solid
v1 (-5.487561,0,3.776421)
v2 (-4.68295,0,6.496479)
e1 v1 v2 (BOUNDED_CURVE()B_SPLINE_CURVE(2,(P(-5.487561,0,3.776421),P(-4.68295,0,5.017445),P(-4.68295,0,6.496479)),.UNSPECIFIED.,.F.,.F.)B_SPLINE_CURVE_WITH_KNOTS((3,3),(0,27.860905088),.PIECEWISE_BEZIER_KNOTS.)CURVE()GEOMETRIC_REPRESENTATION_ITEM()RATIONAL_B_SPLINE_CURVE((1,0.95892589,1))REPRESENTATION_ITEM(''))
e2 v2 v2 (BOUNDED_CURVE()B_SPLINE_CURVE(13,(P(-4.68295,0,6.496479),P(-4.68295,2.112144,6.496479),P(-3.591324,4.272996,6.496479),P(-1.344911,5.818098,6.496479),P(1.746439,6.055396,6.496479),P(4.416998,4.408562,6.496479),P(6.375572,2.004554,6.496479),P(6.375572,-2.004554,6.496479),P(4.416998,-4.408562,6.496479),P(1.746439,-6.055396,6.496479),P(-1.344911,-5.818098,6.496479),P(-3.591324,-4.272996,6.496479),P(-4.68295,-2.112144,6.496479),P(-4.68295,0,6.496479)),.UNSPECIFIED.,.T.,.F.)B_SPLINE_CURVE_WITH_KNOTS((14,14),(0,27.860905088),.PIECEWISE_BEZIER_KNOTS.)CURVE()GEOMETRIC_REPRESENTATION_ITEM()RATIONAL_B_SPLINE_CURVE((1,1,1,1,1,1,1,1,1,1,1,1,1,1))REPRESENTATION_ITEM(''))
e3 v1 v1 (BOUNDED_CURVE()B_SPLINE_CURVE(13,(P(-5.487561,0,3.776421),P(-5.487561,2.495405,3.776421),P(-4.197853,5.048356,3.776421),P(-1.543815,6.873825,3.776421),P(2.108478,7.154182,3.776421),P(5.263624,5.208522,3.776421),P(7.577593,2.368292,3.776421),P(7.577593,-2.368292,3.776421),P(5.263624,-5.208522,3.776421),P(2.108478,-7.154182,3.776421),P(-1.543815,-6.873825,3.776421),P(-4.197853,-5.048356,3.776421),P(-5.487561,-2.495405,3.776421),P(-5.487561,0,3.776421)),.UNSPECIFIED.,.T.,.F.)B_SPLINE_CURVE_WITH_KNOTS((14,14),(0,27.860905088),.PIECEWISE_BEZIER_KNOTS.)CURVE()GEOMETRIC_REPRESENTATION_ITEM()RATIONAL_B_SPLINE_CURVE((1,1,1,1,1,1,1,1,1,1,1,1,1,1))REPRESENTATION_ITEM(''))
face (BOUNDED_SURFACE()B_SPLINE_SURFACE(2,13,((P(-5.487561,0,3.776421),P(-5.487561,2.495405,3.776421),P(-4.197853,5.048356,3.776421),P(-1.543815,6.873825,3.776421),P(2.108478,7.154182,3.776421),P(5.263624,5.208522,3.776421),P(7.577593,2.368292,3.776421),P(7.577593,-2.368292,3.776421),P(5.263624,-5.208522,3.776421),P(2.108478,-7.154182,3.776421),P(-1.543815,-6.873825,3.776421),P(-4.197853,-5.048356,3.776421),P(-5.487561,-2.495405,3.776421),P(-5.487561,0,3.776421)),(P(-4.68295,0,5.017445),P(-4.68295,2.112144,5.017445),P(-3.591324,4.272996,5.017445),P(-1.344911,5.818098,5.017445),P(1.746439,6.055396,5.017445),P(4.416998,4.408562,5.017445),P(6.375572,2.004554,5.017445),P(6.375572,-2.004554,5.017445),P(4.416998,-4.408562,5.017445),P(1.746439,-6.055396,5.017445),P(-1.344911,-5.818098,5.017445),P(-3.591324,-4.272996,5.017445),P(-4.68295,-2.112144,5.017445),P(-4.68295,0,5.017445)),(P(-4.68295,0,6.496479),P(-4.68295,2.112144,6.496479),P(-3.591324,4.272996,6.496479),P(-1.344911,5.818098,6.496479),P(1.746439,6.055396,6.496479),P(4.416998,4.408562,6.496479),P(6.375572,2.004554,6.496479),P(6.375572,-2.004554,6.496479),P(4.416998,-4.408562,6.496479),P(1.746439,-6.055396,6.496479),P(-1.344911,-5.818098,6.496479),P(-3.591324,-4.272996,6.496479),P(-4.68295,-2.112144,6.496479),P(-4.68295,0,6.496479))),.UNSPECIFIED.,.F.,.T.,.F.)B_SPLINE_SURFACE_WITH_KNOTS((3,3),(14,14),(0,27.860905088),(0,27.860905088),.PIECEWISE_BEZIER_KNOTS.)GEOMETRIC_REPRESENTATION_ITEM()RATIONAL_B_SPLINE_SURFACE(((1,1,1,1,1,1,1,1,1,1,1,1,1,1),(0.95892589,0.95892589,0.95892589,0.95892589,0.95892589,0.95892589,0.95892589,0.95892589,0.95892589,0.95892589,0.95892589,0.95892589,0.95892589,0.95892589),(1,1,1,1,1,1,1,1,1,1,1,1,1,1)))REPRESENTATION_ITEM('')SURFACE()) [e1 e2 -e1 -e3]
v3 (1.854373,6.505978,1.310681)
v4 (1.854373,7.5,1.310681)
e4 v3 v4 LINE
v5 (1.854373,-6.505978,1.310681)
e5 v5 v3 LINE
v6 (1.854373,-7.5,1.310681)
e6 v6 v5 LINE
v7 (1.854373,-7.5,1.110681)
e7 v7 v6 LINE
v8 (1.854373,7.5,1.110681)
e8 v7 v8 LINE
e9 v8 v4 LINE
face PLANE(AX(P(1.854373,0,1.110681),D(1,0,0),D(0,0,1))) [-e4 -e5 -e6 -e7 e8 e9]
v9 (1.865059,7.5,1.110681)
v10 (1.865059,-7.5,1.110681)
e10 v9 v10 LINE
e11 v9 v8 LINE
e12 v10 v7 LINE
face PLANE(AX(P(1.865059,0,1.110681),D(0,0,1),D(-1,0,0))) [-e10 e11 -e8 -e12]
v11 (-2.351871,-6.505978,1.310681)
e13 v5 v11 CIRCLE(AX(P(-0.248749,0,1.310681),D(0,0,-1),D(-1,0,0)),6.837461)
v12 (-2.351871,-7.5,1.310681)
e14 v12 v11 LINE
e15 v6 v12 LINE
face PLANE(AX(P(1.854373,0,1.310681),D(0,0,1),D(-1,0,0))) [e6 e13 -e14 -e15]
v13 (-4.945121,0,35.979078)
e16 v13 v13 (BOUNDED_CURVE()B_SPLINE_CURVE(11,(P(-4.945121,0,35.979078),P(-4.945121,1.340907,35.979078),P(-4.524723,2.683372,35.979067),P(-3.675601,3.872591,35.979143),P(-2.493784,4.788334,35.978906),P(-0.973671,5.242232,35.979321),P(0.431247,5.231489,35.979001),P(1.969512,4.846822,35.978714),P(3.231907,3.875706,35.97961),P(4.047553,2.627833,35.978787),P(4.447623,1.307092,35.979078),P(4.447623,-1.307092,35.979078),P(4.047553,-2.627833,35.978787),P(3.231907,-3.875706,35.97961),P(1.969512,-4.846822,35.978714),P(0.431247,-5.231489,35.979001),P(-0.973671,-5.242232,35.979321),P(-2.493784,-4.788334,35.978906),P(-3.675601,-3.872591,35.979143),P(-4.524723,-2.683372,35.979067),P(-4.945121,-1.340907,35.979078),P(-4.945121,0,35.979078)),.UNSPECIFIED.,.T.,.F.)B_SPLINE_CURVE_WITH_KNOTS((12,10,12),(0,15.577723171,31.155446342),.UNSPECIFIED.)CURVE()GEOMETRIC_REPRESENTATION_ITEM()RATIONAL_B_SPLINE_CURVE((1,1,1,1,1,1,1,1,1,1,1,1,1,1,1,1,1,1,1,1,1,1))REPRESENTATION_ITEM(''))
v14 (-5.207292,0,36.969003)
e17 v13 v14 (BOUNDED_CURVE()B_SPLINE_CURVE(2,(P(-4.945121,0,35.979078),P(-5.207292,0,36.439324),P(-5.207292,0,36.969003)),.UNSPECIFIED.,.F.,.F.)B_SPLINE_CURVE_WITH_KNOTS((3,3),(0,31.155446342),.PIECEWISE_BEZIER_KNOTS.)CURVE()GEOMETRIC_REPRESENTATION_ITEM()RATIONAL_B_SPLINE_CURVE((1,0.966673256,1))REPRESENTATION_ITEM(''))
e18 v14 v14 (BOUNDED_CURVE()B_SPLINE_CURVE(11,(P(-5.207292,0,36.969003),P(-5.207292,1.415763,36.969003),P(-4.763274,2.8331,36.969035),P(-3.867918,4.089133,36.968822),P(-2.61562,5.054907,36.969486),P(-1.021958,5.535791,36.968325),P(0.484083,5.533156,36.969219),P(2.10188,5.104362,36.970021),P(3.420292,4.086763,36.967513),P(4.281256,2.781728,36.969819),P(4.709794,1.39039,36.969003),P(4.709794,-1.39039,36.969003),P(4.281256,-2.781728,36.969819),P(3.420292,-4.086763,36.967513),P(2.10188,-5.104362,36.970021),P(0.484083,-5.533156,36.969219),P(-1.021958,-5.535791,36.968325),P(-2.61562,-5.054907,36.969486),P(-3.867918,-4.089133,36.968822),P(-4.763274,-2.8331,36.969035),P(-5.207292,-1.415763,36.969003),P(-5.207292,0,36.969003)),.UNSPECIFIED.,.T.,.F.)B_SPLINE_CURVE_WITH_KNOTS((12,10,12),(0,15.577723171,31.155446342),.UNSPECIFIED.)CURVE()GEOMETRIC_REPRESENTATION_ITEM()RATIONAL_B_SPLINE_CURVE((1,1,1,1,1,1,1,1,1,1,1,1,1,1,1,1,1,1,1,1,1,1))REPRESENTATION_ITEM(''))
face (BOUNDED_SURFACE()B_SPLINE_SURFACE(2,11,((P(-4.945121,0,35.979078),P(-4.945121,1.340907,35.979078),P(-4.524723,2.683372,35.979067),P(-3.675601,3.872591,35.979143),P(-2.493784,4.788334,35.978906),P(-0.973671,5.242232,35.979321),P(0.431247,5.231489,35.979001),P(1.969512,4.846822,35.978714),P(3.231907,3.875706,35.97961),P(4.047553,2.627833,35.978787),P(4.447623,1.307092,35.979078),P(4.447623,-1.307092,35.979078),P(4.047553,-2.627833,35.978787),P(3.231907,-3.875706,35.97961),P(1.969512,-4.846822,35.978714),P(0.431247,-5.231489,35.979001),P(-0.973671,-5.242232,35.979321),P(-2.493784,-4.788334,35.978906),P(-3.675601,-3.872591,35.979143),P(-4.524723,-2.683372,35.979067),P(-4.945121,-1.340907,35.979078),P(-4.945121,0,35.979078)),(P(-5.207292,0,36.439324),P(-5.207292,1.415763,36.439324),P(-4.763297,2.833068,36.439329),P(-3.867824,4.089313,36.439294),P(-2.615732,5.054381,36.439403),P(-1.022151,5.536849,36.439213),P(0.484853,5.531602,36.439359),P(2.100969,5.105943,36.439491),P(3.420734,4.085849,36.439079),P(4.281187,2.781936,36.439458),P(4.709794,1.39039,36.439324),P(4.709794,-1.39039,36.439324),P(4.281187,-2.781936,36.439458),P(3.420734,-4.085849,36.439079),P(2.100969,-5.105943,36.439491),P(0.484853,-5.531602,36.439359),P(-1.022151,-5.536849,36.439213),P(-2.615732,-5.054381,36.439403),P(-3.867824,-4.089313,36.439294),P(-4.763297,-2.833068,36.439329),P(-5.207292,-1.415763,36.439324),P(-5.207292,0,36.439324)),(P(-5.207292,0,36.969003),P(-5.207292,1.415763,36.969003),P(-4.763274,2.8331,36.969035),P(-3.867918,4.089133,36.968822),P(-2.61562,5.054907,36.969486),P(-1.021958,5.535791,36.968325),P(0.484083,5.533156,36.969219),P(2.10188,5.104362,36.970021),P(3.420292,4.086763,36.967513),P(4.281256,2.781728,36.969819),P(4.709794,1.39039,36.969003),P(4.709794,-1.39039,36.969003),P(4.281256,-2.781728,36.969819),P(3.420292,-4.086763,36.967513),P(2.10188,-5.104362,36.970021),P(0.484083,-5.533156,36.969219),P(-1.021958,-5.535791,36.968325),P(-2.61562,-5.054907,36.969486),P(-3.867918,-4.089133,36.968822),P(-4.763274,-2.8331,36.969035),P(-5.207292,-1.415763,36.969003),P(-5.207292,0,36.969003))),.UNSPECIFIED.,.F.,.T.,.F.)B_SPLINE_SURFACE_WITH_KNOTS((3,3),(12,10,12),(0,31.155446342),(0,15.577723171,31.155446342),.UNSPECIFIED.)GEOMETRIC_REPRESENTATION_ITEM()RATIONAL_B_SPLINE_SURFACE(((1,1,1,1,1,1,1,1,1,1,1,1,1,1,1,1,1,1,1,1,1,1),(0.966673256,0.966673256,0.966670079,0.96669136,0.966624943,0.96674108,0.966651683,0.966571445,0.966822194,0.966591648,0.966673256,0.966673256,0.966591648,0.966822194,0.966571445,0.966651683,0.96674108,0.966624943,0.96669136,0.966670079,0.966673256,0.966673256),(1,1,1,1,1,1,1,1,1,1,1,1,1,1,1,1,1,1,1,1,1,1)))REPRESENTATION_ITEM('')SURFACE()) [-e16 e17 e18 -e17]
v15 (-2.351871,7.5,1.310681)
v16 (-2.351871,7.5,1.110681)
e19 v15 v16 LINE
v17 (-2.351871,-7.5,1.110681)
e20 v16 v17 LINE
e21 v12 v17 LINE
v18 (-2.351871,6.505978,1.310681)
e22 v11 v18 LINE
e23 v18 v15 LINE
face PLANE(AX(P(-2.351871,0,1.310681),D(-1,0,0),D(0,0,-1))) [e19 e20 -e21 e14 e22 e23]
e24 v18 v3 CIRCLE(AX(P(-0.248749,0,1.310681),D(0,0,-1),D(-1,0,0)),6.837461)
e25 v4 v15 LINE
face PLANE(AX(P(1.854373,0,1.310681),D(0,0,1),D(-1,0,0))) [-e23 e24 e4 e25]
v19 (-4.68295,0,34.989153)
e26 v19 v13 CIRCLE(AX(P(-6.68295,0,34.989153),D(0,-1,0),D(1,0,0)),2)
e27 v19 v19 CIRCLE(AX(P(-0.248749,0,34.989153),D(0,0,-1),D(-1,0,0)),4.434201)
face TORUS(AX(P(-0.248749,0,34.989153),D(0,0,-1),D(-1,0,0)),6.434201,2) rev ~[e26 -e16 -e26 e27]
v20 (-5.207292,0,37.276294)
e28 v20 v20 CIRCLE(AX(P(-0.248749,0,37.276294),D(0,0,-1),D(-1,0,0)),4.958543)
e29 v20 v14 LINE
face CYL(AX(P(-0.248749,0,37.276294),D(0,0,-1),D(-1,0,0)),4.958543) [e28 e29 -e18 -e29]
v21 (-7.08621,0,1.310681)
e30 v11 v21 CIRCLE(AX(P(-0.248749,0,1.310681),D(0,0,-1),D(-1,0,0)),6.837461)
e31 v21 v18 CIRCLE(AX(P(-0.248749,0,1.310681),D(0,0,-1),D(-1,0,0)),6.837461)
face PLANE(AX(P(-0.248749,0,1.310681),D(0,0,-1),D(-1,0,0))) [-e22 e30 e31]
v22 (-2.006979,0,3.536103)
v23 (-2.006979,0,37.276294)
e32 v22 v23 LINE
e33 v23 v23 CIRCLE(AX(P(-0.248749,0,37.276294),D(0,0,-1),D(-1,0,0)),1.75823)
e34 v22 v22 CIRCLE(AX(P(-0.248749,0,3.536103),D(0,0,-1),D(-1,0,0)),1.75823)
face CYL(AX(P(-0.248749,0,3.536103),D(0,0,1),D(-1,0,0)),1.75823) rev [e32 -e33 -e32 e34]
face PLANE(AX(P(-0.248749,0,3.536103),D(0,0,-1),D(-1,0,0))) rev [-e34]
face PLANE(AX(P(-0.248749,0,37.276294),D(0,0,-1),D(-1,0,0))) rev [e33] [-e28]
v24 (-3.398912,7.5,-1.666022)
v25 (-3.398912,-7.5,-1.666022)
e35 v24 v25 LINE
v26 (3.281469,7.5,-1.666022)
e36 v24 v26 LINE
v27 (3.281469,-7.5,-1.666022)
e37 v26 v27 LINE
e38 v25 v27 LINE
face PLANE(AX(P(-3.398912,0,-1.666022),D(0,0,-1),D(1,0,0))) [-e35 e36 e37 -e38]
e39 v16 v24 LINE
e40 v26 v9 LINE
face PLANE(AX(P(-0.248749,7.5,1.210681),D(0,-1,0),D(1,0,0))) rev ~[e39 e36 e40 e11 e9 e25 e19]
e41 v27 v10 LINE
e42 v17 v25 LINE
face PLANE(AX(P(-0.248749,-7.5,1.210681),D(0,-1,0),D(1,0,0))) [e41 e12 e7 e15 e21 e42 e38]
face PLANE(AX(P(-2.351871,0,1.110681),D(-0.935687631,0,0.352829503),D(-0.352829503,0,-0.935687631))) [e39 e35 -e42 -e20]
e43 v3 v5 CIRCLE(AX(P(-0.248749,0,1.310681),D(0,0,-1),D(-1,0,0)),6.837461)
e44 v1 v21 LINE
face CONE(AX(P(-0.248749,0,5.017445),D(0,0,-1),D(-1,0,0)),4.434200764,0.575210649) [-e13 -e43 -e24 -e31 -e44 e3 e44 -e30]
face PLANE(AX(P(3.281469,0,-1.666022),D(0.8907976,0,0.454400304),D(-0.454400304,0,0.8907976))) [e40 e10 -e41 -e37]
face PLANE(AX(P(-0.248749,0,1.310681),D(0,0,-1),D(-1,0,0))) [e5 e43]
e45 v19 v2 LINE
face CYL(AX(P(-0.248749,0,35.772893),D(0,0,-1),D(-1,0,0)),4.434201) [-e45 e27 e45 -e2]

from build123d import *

# Parameters (mm, degrees)
F1_DEPTH    = 7.5
F3_R        = 5
F4_S5_R     = 4.9585432895
F4_T6_DEPTH = 9
F5_R        = 2


# Not quite as in the source:
# - a fillet or chamfer that OpenCascade refuses, or shapes differently, is made with other operations: its cross-section is extruded or revolved along the edge and cut away or added
# - a feature names something its author has since deleted; it is built from what else it names


with BuildPart() as f1:
    # F0 (on Front) → F1 (new body, symmetric)
    with BuildSketch(Plane.XZ):
        Polygon((-2.3518713359, 1.3106813192), (-2.3518713359, 1.1106813192), (1.854373375, 1.1106813192), (1.854373375, 1.3106813192), (-0.2487489805, 1.3106813192), align=None)
        Polygon((-3.3989118356, -1.6660219789), (3.2814688813, -1.6660219789), (1.8650586641, 1.1106813192), (1.854373375, 1.1106813192), (-2.3518713359, 1.1106813192), align=None)
    extrude(amount=F1_DEPTH, both=True)

    # F0 (on Front) → F2 (revolve)
    with BuildSketch(Plane.XZ):
        Polygon((-7.0862104185, 1.3106813192), (-2.3518713359, 1.3106813192), (-0.2487489805, 1.3106813192), (-0.2487489805, 3.5361030605), (-2.0069789607, 3.5361030605), (-2.0069789607, 37.2762935372), (-5.2072922699, 37.2762935372), (-5.2072922699, 36.3391824067), (-4.6829497442, 35.7728934956), (-4.6829497442, 5.0174454227), align=None)
    revolve(axis=Axis((-0.2487489805, 0, -2.0752633687), (0, 0, -1)))

    # F3
    f3_edges = [f1.edges().sort_by_distance(p)[0] for p in [
        (4.185452, 0, 5.017445),
    ]]
    fillet(f3_edges, radius=F3_R)

    # F4: fillet of radius 2 on 1 edges, made by hand


with BuildPart() as f4_tool2:
    # F4_s3 → F4_t4 (revolve)
    with BuildSketch(Plane.XZ):
        with BuildLine():
            ThreePointArc((-4.6829497442, 34.9891533442), (-4.8208218936, 35.718865526), (-5.2154296124, 36.3479707207))
            Line((-5.2154296124, 36.3479707207), (-4.6829497442, 35.7728934956))
            Line((-4.6829497442, 35.7728934956), (-4.6829497442, 34.9891533442))
        make_face()
    revolve(axis=Axis((-0.2487489805, 0, 35.7728934956), (0, 0, -1)))

    # F4_s5 → F4_t6 (intersect, symmetric)
    with BuildSketch(Plane.XY.offset(35.7)):
        with Locations((-0.2487489805, 0)):
            Circle(F4_S5_R)
    extrude(amount=F4_T6_DEPTH, both=True, mode=Mode.INTERSECT)


with BuildPart() as f1_1:
    add(f1.part)

    # F4_t1: union F4_tool2
    add(f4_tool2.part)

    # F5
    f5_edges = [f1_1.edges().sort_by_distance(p)[0] for p in [
        (-0.248749, 4.958543, 36.339129),
        (-0.248749, -4.958543, 36.339129),
    ]]
    fillet(f5_edges, radius=F5_R)


solid = f1_1.part
